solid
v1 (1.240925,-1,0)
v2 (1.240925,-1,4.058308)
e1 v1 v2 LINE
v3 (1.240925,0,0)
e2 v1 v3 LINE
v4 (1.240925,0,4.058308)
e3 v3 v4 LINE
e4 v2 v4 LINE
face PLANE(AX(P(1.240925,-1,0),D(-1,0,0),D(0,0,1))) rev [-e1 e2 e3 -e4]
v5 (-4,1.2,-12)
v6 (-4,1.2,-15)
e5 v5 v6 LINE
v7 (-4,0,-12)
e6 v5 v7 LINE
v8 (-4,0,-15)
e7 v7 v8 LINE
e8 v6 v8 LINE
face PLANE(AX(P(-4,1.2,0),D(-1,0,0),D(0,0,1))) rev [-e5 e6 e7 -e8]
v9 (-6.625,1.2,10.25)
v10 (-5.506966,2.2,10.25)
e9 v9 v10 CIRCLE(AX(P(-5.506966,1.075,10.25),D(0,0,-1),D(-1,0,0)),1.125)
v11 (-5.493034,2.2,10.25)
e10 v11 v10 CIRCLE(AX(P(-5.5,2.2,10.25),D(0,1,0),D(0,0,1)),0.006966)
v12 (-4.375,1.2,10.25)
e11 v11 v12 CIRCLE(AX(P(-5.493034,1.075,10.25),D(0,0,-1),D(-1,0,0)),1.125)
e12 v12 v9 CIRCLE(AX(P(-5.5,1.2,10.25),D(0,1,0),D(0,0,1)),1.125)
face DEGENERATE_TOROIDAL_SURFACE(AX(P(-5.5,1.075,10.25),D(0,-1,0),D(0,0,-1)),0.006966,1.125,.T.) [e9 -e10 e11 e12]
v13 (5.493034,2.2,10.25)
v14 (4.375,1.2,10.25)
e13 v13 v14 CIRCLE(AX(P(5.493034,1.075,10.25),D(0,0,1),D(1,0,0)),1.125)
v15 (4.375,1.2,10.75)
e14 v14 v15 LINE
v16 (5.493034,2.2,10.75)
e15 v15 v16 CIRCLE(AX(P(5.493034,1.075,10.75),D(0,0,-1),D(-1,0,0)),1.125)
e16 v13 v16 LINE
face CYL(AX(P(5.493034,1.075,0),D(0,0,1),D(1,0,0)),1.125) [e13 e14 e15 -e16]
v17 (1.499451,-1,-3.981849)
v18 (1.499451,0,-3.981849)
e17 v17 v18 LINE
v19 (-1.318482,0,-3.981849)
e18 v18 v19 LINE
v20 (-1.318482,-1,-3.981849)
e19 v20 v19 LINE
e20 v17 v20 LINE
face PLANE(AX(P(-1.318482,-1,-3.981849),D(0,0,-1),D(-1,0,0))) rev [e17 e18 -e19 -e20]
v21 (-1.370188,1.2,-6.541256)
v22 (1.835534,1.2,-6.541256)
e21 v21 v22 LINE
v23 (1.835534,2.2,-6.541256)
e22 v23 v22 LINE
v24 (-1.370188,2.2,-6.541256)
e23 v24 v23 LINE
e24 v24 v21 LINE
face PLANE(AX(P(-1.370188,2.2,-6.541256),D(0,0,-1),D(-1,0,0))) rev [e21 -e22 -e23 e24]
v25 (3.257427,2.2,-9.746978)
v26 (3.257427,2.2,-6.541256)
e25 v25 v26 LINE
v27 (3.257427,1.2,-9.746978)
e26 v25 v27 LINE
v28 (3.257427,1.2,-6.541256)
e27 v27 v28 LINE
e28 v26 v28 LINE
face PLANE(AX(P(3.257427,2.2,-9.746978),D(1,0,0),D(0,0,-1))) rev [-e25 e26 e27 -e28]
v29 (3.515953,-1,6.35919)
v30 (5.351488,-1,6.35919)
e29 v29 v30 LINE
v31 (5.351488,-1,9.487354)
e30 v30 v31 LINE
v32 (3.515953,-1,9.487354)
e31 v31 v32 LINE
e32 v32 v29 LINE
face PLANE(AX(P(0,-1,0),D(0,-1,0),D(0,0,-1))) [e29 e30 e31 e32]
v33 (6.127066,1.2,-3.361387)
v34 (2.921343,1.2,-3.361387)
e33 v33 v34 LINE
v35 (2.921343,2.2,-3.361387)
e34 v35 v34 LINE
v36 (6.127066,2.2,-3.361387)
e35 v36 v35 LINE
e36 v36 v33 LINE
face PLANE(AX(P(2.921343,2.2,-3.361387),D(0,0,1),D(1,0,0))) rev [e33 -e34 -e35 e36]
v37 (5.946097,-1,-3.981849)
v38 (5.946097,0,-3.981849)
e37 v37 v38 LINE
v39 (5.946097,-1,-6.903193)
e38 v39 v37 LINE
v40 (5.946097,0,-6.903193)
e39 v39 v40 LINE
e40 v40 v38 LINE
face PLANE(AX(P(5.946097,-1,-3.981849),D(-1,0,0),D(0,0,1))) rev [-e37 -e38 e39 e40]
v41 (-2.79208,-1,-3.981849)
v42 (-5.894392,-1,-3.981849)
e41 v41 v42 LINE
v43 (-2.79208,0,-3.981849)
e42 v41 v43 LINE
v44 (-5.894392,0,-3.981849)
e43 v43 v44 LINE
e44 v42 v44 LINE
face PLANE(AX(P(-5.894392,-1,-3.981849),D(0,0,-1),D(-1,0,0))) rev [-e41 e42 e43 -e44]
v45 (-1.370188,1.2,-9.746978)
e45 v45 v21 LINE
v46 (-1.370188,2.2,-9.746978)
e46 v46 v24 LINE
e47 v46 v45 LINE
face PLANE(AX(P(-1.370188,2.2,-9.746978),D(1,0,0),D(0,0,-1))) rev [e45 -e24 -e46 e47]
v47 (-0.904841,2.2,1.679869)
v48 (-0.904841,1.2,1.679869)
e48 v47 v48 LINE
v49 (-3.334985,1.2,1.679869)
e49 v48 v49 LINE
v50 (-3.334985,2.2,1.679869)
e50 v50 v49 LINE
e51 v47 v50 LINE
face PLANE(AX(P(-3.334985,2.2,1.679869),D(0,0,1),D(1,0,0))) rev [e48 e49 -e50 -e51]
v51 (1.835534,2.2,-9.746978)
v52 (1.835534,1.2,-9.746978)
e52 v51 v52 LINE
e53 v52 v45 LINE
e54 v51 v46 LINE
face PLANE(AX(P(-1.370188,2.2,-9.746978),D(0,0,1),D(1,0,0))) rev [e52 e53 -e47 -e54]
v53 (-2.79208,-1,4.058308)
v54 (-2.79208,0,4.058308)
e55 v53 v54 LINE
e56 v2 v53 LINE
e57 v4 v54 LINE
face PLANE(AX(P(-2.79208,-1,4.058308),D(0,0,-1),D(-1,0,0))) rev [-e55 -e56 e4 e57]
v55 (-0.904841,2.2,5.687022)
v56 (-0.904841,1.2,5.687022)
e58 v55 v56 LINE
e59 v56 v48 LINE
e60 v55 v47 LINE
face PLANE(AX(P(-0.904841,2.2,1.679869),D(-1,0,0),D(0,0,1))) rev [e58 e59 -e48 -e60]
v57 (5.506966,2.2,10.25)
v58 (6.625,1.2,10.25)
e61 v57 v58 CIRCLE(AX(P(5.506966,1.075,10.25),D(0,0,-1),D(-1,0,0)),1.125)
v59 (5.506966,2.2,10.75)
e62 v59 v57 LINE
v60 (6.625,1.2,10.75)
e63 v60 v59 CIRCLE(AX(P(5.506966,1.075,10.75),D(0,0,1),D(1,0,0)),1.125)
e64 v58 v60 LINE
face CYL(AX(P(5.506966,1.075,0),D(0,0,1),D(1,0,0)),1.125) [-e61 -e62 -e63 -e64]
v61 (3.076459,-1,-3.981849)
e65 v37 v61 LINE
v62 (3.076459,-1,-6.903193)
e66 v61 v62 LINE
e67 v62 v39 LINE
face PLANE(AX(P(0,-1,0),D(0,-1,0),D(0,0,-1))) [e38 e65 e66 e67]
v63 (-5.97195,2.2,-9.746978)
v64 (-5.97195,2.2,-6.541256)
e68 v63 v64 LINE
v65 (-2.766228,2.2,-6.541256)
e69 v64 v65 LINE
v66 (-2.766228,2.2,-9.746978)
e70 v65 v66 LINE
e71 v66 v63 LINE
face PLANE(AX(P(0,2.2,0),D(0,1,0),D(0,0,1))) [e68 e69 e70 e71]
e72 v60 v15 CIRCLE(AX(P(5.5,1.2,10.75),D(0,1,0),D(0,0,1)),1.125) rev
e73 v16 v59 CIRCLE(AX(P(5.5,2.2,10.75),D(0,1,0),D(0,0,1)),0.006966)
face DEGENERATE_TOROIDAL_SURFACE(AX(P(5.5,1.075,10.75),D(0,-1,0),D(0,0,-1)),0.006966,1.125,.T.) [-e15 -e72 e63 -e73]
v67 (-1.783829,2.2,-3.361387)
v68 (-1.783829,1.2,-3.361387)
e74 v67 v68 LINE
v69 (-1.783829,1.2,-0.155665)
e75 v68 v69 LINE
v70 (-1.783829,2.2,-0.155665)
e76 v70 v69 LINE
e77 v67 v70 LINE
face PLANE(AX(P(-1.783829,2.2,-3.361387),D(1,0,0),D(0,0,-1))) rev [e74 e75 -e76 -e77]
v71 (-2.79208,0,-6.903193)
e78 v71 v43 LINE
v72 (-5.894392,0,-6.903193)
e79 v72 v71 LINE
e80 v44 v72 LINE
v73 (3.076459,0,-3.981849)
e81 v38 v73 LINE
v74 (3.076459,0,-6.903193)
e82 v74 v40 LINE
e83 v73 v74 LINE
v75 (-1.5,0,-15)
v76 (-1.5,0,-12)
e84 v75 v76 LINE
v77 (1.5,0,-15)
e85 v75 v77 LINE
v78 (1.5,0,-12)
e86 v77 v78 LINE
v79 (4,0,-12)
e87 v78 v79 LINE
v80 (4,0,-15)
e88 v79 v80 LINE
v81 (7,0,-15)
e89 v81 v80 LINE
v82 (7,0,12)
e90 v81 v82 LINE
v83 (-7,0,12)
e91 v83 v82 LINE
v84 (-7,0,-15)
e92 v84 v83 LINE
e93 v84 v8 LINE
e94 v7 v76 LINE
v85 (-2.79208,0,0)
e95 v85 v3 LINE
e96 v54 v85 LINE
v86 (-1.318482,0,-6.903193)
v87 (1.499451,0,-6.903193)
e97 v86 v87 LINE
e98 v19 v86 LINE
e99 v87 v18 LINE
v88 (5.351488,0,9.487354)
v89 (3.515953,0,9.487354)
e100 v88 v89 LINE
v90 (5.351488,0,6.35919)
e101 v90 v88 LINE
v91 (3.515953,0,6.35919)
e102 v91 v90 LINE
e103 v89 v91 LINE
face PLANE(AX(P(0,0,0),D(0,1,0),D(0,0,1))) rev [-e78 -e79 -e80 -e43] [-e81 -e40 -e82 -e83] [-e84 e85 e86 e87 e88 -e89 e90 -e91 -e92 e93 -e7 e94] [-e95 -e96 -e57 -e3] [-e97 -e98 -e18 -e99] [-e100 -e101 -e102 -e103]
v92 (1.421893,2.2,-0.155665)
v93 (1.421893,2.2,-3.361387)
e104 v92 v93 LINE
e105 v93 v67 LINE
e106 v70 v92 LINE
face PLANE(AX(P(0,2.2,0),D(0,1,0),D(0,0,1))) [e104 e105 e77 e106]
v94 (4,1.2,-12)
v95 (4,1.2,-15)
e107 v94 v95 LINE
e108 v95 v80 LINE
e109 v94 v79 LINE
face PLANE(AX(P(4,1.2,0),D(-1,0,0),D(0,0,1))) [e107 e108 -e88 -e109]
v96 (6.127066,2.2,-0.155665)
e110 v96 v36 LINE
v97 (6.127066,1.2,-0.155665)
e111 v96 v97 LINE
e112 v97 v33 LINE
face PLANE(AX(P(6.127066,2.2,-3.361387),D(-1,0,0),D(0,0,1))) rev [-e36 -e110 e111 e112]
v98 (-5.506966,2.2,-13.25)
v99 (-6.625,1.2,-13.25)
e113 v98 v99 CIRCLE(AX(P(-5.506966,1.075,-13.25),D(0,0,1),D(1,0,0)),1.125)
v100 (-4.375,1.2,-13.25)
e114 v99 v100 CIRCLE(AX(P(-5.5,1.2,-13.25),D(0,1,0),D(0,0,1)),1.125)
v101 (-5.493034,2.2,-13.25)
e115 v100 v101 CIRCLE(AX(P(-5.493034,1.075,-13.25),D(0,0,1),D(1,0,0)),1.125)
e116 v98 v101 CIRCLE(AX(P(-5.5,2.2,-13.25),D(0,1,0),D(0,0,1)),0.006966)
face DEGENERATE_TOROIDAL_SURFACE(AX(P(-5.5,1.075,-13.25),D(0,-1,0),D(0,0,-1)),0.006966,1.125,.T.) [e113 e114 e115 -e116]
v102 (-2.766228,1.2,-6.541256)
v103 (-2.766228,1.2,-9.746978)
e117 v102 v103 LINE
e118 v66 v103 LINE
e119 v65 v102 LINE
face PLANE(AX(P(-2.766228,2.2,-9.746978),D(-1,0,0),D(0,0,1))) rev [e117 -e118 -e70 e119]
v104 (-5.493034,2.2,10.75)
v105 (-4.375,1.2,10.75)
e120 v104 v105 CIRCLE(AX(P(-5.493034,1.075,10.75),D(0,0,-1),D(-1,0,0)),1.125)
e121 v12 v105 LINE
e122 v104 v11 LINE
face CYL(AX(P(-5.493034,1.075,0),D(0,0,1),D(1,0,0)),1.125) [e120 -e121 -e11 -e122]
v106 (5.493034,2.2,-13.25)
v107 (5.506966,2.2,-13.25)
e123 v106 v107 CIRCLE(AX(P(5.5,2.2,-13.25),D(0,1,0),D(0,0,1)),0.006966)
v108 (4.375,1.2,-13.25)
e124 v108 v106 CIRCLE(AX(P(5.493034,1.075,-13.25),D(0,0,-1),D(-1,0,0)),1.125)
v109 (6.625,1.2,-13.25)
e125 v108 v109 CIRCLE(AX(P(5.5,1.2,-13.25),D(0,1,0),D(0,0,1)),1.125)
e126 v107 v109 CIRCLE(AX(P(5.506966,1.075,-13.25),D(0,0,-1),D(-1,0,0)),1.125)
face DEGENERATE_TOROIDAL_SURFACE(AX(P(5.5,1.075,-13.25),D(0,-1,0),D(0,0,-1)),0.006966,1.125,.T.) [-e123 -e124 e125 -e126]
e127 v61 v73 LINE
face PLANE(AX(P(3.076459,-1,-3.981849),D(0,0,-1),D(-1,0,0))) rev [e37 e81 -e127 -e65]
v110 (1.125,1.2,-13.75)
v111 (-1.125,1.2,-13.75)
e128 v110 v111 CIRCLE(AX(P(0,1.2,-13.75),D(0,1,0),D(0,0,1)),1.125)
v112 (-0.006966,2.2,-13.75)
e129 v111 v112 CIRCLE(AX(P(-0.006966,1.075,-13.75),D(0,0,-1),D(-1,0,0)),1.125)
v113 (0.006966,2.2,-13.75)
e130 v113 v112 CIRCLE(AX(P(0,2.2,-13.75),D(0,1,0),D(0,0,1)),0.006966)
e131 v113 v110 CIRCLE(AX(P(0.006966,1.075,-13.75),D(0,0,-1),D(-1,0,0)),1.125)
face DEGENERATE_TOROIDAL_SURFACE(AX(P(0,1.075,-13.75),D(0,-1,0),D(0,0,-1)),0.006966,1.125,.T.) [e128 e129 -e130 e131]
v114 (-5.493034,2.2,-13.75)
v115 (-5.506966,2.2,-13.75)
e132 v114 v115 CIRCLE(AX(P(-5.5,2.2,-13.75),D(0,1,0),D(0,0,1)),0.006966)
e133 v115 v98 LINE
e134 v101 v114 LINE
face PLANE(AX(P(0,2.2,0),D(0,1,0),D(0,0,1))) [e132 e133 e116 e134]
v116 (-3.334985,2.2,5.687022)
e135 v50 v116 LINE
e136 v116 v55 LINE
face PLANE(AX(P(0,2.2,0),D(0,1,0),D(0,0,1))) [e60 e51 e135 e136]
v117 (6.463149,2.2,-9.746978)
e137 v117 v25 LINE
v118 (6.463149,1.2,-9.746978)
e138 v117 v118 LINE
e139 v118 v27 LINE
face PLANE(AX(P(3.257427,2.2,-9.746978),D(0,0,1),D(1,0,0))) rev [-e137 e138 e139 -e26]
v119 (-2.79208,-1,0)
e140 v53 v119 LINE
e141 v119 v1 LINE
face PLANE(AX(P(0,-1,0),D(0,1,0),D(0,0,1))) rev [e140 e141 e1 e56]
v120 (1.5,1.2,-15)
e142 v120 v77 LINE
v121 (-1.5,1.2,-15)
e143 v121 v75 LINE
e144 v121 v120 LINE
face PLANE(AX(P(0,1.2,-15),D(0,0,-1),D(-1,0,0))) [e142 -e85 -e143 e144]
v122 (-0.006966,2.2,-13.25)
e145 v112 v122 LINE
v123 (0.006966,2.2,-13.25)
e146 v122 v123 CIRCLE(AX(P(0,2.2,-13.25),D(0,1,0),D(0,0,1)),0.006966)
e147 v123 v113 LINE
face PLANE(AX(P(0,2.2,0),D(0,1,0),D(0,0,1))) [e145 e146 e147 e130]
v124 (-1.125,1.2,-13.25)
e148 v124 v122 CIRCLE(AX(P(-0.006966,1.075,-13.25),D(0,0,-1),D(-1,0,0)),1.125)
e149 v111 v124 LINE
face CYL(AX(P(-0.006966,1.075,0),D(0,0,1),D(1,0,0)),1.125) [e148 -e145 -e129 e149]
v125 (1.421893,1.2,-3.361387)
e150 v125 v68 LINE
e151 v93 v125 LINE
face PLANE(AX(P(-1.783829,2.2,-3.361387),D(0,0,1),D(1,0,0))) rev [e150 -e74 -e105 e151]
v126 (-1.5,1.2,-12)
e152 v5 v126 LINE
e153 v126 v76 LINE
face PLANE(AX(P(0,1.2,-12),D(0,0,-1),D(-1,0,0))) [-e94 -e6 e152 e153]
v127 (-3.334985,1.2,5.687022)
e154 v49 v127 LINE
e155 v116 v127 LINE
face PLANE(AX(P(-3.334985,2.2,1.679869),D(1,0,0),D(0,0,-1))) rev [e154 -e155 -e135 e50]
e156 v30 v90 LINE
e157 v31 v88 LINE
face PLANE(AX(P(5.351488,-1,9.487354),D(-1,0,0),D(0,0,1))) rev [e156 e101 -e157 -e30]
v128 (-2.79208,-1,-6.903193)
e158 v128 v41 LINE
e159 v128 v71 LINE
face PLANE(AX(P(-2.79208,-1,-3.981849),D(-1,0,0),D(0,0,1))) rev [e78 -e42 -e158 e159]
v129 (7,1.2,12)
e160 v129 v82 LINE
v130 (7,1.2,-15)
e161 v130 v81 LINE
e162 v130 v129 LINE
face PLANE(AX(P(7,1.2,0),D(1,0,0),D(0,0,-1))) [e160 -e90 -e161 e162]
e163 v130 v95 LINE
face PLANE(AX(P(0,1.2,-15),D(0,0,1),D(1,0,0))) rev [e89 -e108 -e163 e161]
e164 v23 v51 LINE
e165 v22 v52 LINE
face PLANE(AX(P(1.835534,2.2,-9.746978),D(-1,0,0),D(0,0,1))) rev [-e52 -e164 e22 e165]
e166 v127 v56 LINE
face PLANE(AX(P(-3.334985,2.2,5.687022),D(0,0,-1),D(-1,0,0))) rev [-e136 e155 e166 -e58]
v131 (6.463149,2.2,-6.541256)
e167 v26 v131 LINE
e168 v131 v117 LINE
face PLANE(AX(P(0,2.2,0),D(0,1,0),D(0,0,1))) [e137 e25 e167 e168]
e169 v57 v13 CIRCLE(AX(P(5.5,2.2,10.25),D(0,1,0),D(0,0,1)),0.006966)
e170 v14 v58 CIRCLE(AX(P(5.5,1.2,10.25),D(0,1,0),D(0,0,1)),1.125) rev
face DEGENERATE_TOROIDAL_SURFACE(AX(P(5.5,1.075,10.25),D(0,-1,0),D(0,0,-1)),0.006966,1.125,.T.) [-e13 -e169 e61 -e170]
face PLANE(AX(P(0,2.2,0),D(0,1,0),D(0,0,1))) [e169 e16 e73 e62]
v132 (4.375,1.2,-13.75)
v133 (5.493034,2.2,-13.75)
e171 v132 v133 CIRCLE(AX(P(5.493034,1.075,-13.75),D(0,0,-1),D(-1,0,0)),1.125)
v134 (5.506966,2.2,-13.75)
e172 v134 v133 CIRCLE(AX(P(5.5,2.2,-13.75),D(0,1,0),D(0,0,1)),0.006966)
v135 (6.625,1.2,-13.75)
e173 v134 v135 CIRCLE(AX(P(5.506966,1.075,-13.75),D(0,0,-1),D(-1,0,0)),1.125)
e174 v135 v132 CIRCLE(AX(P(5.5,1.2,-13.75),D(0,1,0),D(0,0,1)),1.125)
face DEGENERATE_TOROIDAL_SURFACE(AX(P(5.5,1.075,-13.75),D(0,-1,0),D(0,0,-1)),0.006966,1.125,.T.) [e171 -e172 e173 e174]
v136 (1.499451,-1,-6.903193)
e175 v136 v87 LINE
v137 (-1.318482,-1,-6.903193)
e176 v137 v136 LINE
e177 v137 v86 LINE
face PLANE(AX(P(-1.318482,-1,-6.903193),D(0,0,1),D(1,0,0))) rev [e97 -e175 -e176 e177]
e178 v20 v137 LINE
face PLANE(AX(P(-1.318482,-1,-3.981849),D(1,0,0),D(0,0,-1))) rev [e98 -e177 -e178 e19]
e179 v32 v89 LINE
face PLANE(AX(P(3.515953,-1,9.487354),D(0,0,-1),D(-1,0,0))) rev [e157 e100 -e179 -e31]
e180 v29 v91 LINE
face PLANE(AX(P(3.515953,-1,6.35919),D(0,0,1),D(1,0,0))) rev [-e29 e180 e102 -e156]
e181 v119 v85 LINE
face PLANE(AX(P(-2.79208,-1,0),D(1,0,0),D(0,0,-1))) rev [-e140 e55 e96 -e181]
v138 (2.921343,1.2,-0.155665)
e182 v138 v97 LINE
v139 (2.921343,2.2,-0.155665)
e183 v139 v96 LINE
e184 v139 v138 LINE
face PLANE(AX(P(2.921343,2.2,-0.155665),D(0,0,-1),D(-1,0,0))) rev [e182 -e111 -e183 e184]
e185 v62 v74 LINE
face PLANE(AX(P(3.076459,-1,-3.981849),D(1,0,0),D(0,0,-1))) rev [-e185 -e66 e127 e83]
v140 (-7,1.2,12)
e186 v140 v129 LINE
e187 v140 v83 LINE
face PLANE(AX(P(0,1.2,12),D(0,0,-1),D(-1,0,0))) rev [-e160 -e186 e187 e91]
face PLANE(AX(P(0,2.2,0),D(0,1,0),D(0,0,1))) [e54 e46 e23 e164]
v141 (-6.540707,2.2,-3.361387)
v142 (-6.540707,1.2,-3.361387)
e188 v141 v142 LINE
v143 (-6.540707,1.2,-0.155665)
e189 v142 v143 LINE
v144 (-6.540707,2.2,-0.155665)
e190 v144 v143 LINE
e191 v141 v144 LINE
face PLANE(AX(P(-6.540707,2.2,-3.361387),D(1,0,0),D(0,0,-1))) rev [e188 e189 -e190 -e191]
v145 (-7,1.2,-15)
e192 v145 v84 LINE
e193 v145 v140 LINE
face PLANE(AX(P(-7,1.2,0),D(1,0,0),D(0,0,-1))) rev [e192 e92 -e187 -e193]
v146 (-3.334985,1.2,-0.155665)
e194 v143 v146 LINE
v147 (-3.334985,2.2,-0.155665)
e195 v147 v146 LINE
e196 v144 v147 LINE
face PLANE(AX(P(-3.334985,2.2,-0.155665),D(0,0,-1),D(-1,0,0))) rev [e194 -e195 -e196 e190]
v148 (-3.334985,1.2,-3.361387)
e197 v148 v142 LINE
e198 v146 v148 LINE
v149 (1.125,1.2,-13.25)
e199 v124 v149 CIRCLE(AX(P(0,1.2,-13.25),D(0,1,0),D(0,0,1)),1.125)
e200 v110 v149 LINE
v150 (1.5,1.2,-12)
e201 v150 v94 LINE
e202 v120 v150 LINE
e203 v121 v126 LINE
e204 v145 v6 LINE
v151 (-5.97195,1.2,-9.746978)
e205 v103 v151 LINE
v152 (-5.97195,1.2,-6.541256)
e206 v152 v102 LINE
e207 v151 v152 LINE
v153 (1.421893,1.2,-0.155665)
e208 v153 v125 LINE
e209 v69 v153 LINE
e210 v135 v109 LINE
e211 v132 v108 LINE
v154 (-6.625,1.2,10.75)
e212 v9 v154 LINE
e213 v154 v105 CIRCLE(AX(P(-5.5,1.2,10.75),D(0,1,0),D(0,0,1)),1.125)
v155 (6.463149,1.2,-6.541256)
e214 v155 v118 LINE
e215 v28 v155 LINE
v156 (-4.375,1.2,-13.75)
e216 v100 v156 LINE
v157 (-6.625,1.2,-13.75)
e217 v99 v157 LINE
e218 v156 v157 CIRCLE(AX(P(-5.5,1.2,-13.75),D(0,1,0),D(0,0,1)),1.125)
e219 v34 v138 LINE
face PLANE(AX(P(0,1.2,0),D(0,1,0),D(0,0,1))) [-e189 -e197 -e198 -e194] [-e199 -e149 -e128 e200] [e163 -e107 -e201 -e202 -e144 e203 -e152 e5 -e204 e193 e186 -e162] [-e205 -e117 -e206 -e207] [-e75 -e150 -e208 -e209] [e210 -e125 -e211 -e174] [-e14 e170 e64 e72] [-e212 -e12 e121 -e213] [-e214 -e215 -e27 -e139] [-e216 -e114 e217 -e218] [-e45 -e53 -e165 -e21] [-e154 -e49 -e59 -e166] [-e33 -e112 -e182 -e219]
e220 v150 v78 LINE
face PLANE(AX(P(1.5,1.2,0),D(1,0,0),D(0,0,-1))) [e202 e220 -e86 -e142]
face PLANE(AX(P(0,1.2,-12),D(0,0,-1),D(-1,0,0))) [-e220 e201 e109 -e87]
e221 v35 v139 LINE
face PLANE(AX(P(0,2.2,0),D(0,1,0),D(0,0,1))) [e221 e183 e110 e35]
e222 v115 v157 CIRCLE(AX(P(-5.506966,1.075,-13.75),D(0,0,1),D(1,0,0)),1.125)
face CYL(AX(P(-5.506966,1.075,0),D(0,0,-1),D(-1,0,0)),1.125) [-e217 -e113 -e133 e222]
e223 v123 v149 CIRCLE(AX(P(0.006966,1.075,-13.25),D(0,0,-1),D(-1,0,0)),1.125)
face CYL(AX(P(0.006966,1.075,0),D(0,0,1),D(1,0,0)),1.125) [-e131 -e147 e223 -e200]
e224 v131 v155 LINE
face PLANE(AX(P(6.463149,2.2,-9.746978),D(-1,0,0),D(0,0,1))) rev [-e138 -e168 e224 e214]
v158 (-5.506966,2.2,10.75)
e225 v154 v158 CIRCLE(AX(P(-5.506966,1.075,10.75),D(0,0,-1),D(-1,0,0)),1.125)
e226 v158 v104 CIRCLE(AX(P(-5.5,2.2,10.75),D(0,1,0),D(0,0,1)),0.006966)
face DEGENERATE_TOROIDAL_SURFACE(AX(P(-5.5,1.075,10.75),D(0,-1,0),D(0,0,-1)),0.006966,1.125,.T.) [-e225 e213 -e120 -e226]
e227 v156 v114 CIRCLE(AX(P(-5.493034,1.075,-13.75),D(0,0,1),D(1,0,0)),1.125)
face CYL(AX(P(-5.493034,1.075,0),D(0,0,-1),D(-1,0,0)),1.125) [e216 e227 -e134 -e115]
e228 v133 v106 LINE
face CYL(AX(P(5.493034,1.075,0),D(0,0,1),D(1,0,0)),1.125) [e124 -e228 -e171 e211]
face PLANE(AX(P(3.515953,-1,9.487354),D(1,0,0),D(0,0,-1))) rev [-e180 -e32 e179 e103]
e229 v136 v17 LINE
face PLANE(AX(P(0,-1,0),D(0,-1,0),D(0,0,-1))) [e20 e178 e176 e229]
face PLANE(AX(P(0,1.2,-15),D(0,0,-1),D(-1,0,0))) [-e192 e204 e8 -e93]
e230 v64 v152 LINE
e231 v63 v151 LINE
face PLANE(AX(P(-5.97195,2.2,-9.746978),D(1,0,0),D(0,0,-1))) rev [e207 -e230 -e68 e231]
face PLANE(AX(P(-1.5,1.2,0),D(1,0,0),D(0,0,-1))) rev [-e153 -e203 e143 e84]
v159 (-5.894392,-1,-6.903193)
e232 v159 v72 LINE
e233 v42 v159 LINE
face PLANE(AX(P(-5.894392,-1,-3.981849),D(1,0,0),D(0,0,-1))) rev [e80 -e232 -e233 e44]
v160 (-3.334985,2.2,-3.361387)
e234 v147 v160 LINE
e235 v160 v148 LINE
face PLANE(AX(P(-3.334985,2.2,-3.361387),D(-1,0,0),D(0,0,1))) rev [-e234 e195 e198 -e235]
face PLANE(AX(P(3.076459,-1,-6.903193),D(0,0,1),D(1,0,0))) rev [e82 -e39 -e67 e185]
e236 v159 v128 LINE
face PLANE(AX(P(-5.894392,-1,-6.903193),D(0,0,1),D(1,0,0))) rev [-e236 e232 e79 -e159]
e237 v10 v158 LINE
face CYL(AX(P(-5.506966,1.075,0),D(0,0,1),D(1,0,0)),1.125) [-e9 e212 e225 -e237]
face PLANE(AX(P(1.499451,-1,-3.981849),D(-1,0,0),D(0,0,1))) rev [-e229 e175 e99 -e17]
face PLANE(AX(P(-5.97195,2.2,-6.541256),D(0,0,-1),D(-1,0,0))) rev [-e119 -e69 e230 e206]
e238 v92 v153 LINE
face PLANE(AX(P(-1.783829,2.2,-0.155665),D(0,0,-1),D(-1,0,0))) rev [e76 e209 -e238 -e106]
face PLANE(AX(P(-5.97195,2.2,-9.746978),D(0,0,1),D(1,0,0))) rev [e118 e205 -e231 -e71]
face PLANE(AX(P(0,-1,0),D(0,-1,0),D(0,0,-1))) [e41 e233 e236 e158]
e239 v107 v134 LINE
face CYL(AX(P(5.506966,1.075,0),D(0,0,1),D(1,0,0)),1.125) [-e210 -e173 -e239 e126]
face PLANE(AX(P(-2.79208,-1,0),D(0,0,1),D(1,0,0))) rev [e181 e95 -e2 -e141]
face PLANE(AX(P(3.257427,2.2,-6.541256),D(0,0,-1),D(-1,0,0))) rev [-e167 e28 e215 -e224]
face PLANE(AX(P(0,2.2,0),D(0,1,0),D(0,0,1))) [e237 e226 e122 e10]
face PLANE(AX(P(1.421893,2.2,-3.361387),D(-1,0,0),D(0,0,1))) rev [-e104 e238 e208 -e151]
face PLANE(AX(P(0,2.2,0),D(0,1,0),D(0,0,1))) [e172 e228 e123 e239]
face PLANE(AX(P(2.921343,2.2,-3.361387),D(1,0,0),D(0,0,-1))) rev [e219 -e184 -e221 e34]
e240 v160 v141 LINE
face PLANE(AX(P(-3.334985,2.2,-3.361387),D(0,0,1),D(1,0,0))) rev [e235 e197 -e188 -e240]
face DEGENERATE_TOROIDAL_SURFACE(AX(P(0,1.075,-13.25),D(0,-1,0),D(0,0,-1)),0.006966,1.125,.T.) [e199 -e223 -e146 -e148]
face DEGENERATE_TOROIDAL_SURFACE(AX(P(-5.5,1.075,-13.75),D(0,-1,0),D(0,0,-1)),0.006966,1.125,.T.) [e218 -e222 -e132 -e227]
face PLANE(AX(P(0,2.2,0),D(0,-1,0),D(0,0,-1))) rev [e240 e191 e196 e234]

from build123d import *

# Parameters (mm, degrees)
SKETCH1_W               = 14
SKETCH1_H               = 24
SKETCH1_W_2             = 3
SKETCH1_H_2             = 3
PCB_DEPTH               = 1.2
SOLDER_JOINTS_DEPTH     = 1
SOLDER_FILLETS_R        = 1.125
SKETCH2_W               = 3.205722041
SKETCH2_H               = 3.205722042
SKETCH2_W_2             = 3.205722042
SKETCH2_W_3             = 2.430144128
SKETCH2_H_2             = 4.007152552
TOP_COMPONENTS_DEPTH    = 1
SKETCH3_W               = 4.033005149
SKETCH3_H               = 4.058308378
SKETCH3_W_2             = 3.102311653
SKETCH3_H_2             = 2.921343474
SKETCH3_W_3             = 2.817933085
SKETCH3_W_4             = 2.869638279
SKETCH3_W_5             = 1.835534395
SKETCH3_H_3             = 3.12816425
BOTTOM_COMPONENTS_DEPTH = 1


with BuildPart() as part:
    # Sketch1 → PCB (new body)
    with BuildSketch(Plane(origin=(0, 0, 0), x_dir=(1, 0, 0), z_dir=(0, 1, 0))):
        Rectangle(SKETCH1_W, SKETCH1_H)
        with Locations((-5.5, 13.5)):
            Rectangle(SKETCH1_W_2, SKETCH1_H_2)
        with Locations((0, 13.5)):
            Rectangle(SKETCH1_W_2, SKETCH1_H_2)
        with Locations((5.5, 13.5)):
            Rectangle(SKETCH1_W_2, SKETCH1_H_2)
    extrude(amount=PCB_DEPTH)

    # Sketch5 → Solder joints (add)
    with BuildSketch(Plane(origin=(0, 1.2, 0), x_dir=(1, 0, 0), z_dir=(0, 1, 0))):
        with BuildLine():
            Line((-4.375, 13.25), (-4.375, 13.75))
            ThreePointArc((-4.375, 13.75), (-5.5, 14.875), (-6.625, 13.75))
            Line((-6.625, 13.75), (-6.625, 13.25))
            ThreePointArc((-6.625, 13.25), (-5.5, 12.125), (-4.375, 13.25))
        make_face()
        with BuildLine():
            Line((-1.125, 13.75), (-1.125, 13.25))
            ThreePointArc((-1.125, 13.25), (0, 12.125), (1.125, 13.25))
            Line((1.125, 13.25), (1.125, 13.75))
            ThreePointArc((1.125, 13.75), (0, 14.875), (-1.125, 13.75))
        make_face()
        with BuildLine():
            Line((4.375, 13.75), (4.375, 13.25))
            ThreePointArc((4.375, 13.25), (5.5, 12.125), (6.625, 13.25))
            Line((6.625, 13.25), (6.625, 13.75))
            ThreePointArc((6.625, 13.75), (5.5, 14.875), (4.375, 13.75))
        make_face()
        with BuildLine():
            Line((-6.625, -10.25), (-6.625, -10.75))
            ThreePointArc((-6.625, -10.75), (-5.5, -11.875), (-4.375, -10.75))
            Line((-4.375, -10.75), (-4.375, -10.25))
            ThreePointArc((-4.375, -10.25), (-5.5, -9.125), (-6.625, -10.25))
        make_face()
        with BuildLine():
            ThreePointArc((6.625, -10.75), (5.5, -11.875), (4.375, -10.75))
            Line((4.375, -10.75), (4.375, -10.25))
            ThreePointArc((4.375, -10.25), (5.5, -9.125), (6.625, -10.25))
            Line((6.625, -10.25), (6.625, -10.75))
        make_face()
    extrude(amount=SOLDER_JOINTS_DEPTH)

    # Solder fillets
    # the kernel refuses this fillet: 1.125 mm, written as the material it takes off along each edge
    with BuildSketch(Plane(origin=(-5.5, 2.2, 10.25), x_dir=(1, 0, 0), z_dir=(0, 0, 1))) as solder_fillets_piece_1:
        with BuildLine():
            CenterArc((0.006966011, -1.125), SOLDER_FILLETS_R, 6.379370208, 83.620629792)
            Line((0.006966011, 0), (0.006966011, 0.0225))
            Line((0.006966011, 0.0225), (1.125, 0.0225))
            Line((1.125, 0.0225), (1.1475, 0))
            ThreePointArc((1.1475, 0), (1.1475, -0.5), (1.14736068, -0.9975))
            Line((1.14736068, -0.9975), (1.125, -1))
        make_face()
    revolve(axis=Axis((-5.5, 2.2, 10.25), (0, 1, 0)), revolution_arc=180, mode=Mode.SUBTRACT)
    with BuildSketch(Plane(origin=(-4.375, 2.2, 10.75), x_dir=(0, -1, 0), z_dir=(0, 0, -1)), Plane(origin=(-6.625, 2.2, 10.25), x_dir=(0, -1, 0), z_dir=(0, 0, 1)), Plane(origin=(6.625, 2.2, -13.25), x_dir=(0, -1, 0), z_dir=(0, 0, -1)), Plane(origin=(4.375, 2.2, -13.75), x_dir=(0, -1, 0), z_dir=(0, 0, 1)), Plane(origin=(1.125, 2.2, -13.25), x_dir=(0, -1, 0), z_dir=(0, 0, -1)), Plane(origin=(-1.125, 2.2, -13.75), x_dir=(0, -1, 0), z_dir=(0, 0, 1)), Plane(origin=(-6.625, 2.2, -13.75), x_dir=(0, -1, 0), z_dir=(0, 0, 1)), Plane(origin=(-4.375, 2.2, -13.25), x_dir=(0, -1, 0), z_dir=(0, 0, -1))) as solder_fillets_piece_2:
        with BuildLine():
            CenterArc((1.125, 1.118033989), SOLDER_FILLETS_R, 180, 83.620629792)
            Line((0, 1.118033989), (-0.0225, 1.118033989))
            Line((-0.0225, 1.118033989), (-0.0225, 0))
            Line((-0.0225, 0), (0, -0.0225))
            ThreePointArc((0, -0.0225), (0.5, -0.0225), (0.9975, -0.02236068))
            Line((0.9975, -0.02236068), (1, 0))
        make_face()
    extrude(amount=0.5, mode=Mode.SUBTRACT)
    with BuildSketch(Plane(origin=(-5.5, 2.2, 10.75), x_dir=(-1, 0, 0), z_dir=(0, 0, -1))) as solder_fillets_piece_3:
        with BuildLine():
            CenterArc((0.006966011, -1.125), SOLDER_FILLETS_R, 6.379370208, 83.620629792)
            Line((0.006966011, 0), (0.006966011, 0.0225))
            Line((0.006966011, 0.0225), (1.125, 0.0225))
            Line((1.125, 0.0225), (1.1475, 0))
            ThreePointArc((1.1475, 0), (1.1475, -0.5), (1.14736068, -0.9975))
            Line((1.14736068, -0.9975), (1.125, -1))
        make_face()
    revolve(axis=Axis((-5.5, 2.2, 10.75), (0, 1, 0)), revolution_arc=180, mode=Mode.SUBTRACT)
    with BuildSketch(Plane(origin=(4.375, 2.2, 10.75), x_dir=(0, -1, 0), z_dir=(0, 0, -1)), Plane(origin=(6.625, 2.2, 10.25), x_dir=(0, -1, 0), z_dir=(0, 0, 1))) as solder_fillets_piece_4:
        with BuildLine():
            CenterArc((1.125, -1.118033989), SOLDER_FILLETS_R, 96.379370208, 83.620629792)
            Line((0, -1.118033989), (-0.0225, -1.118033989))
            Line((-0.0225, -1.118033989), (-0.0225, 0))
            Line((-0.0225, 0), (0, 0.0225))
            ThreePointArc((0, 0.0225), (0.5, 0.0225), (0.9975, 0.02236068))
            Line((0.9975, 0.02236068), (1, 0))
        make_face()
    extrude(amount=0.5, mode=Mode.SUBTRACT)
    with BuildSketch(Plane(origin=(5.5, 2.2, 10.25), x_dir=(-1, 0, 0), z_dir=(0, 0, 1))) as solder_fillets_piece_5:
        with BuildLine():
            CenterArc((0.006966011, 1.125), SOLDER_FILLETS_R, 270, 83.620629792)
            Line((0.006966011, 0), (0.006966011, -0.0225))
            Line((0.006966011, -0.0225), (1.125, -0.0225))
            Line((1.125, -0.0225), (1.1475, 0))
            ThreePointArc((1.1475, 0), (1.1475, 0.5), (1.14736068, 0.9975))
            Line((1.14736068, 0.9975), (1.125, 1))
        make_face()
    revolve(axis=Axis((5.5, 2.2, 10.25), (0, -1, 0)), revolution_arc=180, mode=Mode.SUBTRACT)
    with BuildSketch(Plane(origin=(5.5, 2.2, 10.75), x_dir=(1, 0, 0), z_dir=(0, 0, -1))) as solder_fillets_piece_6:
        with BuildLine():
            CenterArc((0.006966011, 1.125), SOLDER_FILLETS_R, 270, 83.620629792)
            Line((0.006966011, 0), (0.006966011, -0.0225))
            Line((0.006966011, -0.0225), (1.125, -0.0225))
            Line((1.125, -0.0225), (1.1475, 0))
            ThreePointArc((1.1475, 0), (1.1475, 0.5), (1.14736068, 0.9975))
            Line((1.14736068, 0.9975), (1.125, 1))
        make_face()
    revolve(axis=Axis((5.5, 2.2, 10.75), (0, -1, 0)), revolution_arc=180, mode=Mode.SUBTRACT)
    with BuildSketch(Plane(origin=(5.5, 2.2, -13.75), x_dir=(1, 0, 0), z_dir=(0, 0, 1))) as solder_fillets_piece_7:
        with BuildLine():
            CenterArc((0.006966011, -1.125), SOLDER_FILLETS_R, 6.379370208, 83.620629792)
            Line((0.006966011, 0), (0.006966011, 0.0225))
            Line((0.006966011, 0.0225), (1.125, 0.0225))
            Line((1.125, 0.0225), (1.1475, 0))
            ThreePointArc((1.1475, 0), (1.1475, -0.5), (1.14736068, -0.9975))
            Line((1.14736068, -0.9975), (1.125, -1))
        make_face()
    revolve(axis=Axis((5.5, 2.2, -13.75), (0, 1, 0)), revolution_arc=180, mode=Mode.SUBTRACT)
    with BuildSketch(Plane(origin=(5.5, 2.2, -13.25), x_dir=(-1, 0, 0), z_dir=(0, 0, -1))) as solder_fillets_piece_8:
        with BuildLine():
            CenterArc((0.006966011, -1.125), SOLDER_FILLETS_R, 6.379370208, 83.620629792)
            Line((0.006966011, 0), (0.006966011, 0.0225))
            Line((0.006966011, 0.0225), (1.125, 0.0225))
            Line((1.125, 0.0225), (1.1475, 0))
            ThreePointArc((1.1475, 0), (1.1475, -0.5), (1.14736068, -0.9975))
            Line((1.14736068, -0.9975), (1.125, -1))
        make_face()
    revolve(axis=Axis((5.5, 2.2, -13.25), (0, 1, 0)), revolution_arc=180, mode=Mode.SUBTRACT)
    with BuildSketch(Plane(origin=(0, 2.2, -13.75), x_dir=(1, 0, 0), z_dir=(0, 0, 1))) as solder_fillets_piece_9:
        with BuildLine():
            CenterArc((0.006966011, -1.125), SOLDER_FILLETS_R, 6.379370208, 83.620629792)
            Line((0.006966011, 0), (0.006966011, 0.0225))
            Line((0.006966011, 0.0225), (1.125, 0.0225))
            Line((1.125, 0.0225), (1.1475, 0))
            ThreePointArc((1.1475, 0), (1.1475, -0.5), (1.14736068, -0.9975))
            Line((1.14736068, -0.9975), (1.125, -1))
        make_face()
    revolve(axis=Axis((0, 2.2, -13.75), (0, 1, 0)), revolution_arc=180, mode=Mode.SUBTRACT)
    with BuildSketch(Plane(origin=(0, 2.2, -13.25), x_dir=(-1, 0, 0), z_dir=(0, 0, -1))) as solder_fillets_piece_10:
        with BuildLine():
            CenterArc((0.006966011, -1.125), SOLDER_FILLETS_R, 6.379370208, 83.620629792)
            Line((0.006966011, 0), (0.006966011, 0.0225))
            Line((0.006966011, 0.0225), (1.125, 0.0225))
            Line((1.125, 0.0225), (1.1475, 0))
            ThreePointArc((1.1475, 0), (1.1475, -0.5), (1.14736068, -0.9975))
            Line((1.14736068, -0.9975), (1.125, -1))
        make_face()
    revolve(axis=Axis((0, 2.2, -13.25), (0, 1, 0)), revolution_arc=180, mode=Mode.SUBTRACT)
    with BuildSketch(Plane(origin=(-5.5, 2.2, -13.25), x_dir=(-1, 0, 0), z_dir=(0, 0, -1))) as solder_fillets_piece_11:
        with BuildLine():
            CenterArc((0.006966011, -1.125), SOLDER_FILLETS_R, 6.379370208, 83.620629792)
            Line((0.006966011, 0), (0.006966011, 0.0225))
            Line((0.006966011, 0.0225), (1.125, 0.0225))
            Line((1.125, 0.0225), (1.1475, 0))
            ThreePointArc((1.1475, 0), (1.1475, -0.5), (1.14736068, -0.9975))
            Line((1.14736068, -0.9975), (1.125, -1))
        make_face()
    revolve(axis=Axis((-5.5, 2.2, -13.25), (0, 1, 0)), revolution_arc=180, mode=Mode.SUBTRACT)
    with BuildSketch(Plane(origin=(-5.5, 2.2, -13.75), x_dir=(1, 0, 0), z_dir=(0, 0, 1))) as solder_fillets_piece_12:
        with BuildLine():
            CenterArc((0.006966011, -1.125), SOLDER_FILLETS_R, 6.379370208, 83.620629792)
            Line((0.006966011, 0), (0.006966011, 0.0225))
            Line((0.006966011, 0.0225), (1.125, 0.0225))
            Line((1.125, 0.0225), (1.1475, 0))
            ThreePointArc((1.1475, 0), (1.1475, -0.5), (1.14736068, -0.9975))
            Line((1.14736068, -0.9975), (1.125, -1))
        make_face()
    revolve(axis=Axis((-5.5, 2.2, -13.75), (0, 1, 0)), revolution_arc=180, mode=Mode.SUBTRACT)

    # Sketch2 → Top components (add)
    with BuildSketch(Plane(origin=(0, 1.2, 0), x_dir=(1, 0, 0), z_dir=(0, 1, 0))):
        with Locations((-4.369088912, 8.144117457)):
            Rectangle(SKETCH2_W, SKETCH2_H)
        with Locations((0.232673374, 8.144117457)):
            Rectangle(SKETCH2_W_2, SKETCH2_H)
        with Locations((4.860288257, 8.144117457)):
            Rectangle(SKETCH2_W, SKETCH2_H)
        with Locations((-4.937846048, 1.758525971)):
            Rectangle(SKETCH2_W_2, SKETCH2_H)
        with Locations((-0.18096818, 1.758525971)):
            Rectangle(SKETCH2_W_2, SKETCH2_H)
        with Locations((4.524204494, 1.758525971)):
            Rectangle(SKETCH2_W_2, SKETCH2_H)
        with Locations((-2.119912963, -3.68344572)):
            Rectangle(SKETCH2_W_3, SKETCH2_H_2)
    extrude(amount=TOP_COMPONENTS_DEPTH)

    # Sketch3 → Bottom components (add)
    with BuildSketch(Plane.XZ):
        with Locations((-0.775577914, 2.029154189)):
            Rectangle(SKETCH3_W, SKETCH3_H)
        with Locations((-4.343236315, -5.442521059)):
            Rectangle(SKETCH3_W_2, SKETCH3_H_2)
        with Locations((0.090484089, -5.442521059)):
            Rectangle(SKETCH3_W_3, SKETCH3_H_2)
        with Locations((4.511278196, -5.442521059)):
            Rectangle(SKETCH3_W_4, SKETCH3_H_2)
        with Locations((4.433720405, 7.923271646)):
            Rectangle(SKETCH3_W_5, SKETCH3_H_3)
    extrude(amount=BOTTOM_COMPONENTS_DEPTH)


solid = part.part
